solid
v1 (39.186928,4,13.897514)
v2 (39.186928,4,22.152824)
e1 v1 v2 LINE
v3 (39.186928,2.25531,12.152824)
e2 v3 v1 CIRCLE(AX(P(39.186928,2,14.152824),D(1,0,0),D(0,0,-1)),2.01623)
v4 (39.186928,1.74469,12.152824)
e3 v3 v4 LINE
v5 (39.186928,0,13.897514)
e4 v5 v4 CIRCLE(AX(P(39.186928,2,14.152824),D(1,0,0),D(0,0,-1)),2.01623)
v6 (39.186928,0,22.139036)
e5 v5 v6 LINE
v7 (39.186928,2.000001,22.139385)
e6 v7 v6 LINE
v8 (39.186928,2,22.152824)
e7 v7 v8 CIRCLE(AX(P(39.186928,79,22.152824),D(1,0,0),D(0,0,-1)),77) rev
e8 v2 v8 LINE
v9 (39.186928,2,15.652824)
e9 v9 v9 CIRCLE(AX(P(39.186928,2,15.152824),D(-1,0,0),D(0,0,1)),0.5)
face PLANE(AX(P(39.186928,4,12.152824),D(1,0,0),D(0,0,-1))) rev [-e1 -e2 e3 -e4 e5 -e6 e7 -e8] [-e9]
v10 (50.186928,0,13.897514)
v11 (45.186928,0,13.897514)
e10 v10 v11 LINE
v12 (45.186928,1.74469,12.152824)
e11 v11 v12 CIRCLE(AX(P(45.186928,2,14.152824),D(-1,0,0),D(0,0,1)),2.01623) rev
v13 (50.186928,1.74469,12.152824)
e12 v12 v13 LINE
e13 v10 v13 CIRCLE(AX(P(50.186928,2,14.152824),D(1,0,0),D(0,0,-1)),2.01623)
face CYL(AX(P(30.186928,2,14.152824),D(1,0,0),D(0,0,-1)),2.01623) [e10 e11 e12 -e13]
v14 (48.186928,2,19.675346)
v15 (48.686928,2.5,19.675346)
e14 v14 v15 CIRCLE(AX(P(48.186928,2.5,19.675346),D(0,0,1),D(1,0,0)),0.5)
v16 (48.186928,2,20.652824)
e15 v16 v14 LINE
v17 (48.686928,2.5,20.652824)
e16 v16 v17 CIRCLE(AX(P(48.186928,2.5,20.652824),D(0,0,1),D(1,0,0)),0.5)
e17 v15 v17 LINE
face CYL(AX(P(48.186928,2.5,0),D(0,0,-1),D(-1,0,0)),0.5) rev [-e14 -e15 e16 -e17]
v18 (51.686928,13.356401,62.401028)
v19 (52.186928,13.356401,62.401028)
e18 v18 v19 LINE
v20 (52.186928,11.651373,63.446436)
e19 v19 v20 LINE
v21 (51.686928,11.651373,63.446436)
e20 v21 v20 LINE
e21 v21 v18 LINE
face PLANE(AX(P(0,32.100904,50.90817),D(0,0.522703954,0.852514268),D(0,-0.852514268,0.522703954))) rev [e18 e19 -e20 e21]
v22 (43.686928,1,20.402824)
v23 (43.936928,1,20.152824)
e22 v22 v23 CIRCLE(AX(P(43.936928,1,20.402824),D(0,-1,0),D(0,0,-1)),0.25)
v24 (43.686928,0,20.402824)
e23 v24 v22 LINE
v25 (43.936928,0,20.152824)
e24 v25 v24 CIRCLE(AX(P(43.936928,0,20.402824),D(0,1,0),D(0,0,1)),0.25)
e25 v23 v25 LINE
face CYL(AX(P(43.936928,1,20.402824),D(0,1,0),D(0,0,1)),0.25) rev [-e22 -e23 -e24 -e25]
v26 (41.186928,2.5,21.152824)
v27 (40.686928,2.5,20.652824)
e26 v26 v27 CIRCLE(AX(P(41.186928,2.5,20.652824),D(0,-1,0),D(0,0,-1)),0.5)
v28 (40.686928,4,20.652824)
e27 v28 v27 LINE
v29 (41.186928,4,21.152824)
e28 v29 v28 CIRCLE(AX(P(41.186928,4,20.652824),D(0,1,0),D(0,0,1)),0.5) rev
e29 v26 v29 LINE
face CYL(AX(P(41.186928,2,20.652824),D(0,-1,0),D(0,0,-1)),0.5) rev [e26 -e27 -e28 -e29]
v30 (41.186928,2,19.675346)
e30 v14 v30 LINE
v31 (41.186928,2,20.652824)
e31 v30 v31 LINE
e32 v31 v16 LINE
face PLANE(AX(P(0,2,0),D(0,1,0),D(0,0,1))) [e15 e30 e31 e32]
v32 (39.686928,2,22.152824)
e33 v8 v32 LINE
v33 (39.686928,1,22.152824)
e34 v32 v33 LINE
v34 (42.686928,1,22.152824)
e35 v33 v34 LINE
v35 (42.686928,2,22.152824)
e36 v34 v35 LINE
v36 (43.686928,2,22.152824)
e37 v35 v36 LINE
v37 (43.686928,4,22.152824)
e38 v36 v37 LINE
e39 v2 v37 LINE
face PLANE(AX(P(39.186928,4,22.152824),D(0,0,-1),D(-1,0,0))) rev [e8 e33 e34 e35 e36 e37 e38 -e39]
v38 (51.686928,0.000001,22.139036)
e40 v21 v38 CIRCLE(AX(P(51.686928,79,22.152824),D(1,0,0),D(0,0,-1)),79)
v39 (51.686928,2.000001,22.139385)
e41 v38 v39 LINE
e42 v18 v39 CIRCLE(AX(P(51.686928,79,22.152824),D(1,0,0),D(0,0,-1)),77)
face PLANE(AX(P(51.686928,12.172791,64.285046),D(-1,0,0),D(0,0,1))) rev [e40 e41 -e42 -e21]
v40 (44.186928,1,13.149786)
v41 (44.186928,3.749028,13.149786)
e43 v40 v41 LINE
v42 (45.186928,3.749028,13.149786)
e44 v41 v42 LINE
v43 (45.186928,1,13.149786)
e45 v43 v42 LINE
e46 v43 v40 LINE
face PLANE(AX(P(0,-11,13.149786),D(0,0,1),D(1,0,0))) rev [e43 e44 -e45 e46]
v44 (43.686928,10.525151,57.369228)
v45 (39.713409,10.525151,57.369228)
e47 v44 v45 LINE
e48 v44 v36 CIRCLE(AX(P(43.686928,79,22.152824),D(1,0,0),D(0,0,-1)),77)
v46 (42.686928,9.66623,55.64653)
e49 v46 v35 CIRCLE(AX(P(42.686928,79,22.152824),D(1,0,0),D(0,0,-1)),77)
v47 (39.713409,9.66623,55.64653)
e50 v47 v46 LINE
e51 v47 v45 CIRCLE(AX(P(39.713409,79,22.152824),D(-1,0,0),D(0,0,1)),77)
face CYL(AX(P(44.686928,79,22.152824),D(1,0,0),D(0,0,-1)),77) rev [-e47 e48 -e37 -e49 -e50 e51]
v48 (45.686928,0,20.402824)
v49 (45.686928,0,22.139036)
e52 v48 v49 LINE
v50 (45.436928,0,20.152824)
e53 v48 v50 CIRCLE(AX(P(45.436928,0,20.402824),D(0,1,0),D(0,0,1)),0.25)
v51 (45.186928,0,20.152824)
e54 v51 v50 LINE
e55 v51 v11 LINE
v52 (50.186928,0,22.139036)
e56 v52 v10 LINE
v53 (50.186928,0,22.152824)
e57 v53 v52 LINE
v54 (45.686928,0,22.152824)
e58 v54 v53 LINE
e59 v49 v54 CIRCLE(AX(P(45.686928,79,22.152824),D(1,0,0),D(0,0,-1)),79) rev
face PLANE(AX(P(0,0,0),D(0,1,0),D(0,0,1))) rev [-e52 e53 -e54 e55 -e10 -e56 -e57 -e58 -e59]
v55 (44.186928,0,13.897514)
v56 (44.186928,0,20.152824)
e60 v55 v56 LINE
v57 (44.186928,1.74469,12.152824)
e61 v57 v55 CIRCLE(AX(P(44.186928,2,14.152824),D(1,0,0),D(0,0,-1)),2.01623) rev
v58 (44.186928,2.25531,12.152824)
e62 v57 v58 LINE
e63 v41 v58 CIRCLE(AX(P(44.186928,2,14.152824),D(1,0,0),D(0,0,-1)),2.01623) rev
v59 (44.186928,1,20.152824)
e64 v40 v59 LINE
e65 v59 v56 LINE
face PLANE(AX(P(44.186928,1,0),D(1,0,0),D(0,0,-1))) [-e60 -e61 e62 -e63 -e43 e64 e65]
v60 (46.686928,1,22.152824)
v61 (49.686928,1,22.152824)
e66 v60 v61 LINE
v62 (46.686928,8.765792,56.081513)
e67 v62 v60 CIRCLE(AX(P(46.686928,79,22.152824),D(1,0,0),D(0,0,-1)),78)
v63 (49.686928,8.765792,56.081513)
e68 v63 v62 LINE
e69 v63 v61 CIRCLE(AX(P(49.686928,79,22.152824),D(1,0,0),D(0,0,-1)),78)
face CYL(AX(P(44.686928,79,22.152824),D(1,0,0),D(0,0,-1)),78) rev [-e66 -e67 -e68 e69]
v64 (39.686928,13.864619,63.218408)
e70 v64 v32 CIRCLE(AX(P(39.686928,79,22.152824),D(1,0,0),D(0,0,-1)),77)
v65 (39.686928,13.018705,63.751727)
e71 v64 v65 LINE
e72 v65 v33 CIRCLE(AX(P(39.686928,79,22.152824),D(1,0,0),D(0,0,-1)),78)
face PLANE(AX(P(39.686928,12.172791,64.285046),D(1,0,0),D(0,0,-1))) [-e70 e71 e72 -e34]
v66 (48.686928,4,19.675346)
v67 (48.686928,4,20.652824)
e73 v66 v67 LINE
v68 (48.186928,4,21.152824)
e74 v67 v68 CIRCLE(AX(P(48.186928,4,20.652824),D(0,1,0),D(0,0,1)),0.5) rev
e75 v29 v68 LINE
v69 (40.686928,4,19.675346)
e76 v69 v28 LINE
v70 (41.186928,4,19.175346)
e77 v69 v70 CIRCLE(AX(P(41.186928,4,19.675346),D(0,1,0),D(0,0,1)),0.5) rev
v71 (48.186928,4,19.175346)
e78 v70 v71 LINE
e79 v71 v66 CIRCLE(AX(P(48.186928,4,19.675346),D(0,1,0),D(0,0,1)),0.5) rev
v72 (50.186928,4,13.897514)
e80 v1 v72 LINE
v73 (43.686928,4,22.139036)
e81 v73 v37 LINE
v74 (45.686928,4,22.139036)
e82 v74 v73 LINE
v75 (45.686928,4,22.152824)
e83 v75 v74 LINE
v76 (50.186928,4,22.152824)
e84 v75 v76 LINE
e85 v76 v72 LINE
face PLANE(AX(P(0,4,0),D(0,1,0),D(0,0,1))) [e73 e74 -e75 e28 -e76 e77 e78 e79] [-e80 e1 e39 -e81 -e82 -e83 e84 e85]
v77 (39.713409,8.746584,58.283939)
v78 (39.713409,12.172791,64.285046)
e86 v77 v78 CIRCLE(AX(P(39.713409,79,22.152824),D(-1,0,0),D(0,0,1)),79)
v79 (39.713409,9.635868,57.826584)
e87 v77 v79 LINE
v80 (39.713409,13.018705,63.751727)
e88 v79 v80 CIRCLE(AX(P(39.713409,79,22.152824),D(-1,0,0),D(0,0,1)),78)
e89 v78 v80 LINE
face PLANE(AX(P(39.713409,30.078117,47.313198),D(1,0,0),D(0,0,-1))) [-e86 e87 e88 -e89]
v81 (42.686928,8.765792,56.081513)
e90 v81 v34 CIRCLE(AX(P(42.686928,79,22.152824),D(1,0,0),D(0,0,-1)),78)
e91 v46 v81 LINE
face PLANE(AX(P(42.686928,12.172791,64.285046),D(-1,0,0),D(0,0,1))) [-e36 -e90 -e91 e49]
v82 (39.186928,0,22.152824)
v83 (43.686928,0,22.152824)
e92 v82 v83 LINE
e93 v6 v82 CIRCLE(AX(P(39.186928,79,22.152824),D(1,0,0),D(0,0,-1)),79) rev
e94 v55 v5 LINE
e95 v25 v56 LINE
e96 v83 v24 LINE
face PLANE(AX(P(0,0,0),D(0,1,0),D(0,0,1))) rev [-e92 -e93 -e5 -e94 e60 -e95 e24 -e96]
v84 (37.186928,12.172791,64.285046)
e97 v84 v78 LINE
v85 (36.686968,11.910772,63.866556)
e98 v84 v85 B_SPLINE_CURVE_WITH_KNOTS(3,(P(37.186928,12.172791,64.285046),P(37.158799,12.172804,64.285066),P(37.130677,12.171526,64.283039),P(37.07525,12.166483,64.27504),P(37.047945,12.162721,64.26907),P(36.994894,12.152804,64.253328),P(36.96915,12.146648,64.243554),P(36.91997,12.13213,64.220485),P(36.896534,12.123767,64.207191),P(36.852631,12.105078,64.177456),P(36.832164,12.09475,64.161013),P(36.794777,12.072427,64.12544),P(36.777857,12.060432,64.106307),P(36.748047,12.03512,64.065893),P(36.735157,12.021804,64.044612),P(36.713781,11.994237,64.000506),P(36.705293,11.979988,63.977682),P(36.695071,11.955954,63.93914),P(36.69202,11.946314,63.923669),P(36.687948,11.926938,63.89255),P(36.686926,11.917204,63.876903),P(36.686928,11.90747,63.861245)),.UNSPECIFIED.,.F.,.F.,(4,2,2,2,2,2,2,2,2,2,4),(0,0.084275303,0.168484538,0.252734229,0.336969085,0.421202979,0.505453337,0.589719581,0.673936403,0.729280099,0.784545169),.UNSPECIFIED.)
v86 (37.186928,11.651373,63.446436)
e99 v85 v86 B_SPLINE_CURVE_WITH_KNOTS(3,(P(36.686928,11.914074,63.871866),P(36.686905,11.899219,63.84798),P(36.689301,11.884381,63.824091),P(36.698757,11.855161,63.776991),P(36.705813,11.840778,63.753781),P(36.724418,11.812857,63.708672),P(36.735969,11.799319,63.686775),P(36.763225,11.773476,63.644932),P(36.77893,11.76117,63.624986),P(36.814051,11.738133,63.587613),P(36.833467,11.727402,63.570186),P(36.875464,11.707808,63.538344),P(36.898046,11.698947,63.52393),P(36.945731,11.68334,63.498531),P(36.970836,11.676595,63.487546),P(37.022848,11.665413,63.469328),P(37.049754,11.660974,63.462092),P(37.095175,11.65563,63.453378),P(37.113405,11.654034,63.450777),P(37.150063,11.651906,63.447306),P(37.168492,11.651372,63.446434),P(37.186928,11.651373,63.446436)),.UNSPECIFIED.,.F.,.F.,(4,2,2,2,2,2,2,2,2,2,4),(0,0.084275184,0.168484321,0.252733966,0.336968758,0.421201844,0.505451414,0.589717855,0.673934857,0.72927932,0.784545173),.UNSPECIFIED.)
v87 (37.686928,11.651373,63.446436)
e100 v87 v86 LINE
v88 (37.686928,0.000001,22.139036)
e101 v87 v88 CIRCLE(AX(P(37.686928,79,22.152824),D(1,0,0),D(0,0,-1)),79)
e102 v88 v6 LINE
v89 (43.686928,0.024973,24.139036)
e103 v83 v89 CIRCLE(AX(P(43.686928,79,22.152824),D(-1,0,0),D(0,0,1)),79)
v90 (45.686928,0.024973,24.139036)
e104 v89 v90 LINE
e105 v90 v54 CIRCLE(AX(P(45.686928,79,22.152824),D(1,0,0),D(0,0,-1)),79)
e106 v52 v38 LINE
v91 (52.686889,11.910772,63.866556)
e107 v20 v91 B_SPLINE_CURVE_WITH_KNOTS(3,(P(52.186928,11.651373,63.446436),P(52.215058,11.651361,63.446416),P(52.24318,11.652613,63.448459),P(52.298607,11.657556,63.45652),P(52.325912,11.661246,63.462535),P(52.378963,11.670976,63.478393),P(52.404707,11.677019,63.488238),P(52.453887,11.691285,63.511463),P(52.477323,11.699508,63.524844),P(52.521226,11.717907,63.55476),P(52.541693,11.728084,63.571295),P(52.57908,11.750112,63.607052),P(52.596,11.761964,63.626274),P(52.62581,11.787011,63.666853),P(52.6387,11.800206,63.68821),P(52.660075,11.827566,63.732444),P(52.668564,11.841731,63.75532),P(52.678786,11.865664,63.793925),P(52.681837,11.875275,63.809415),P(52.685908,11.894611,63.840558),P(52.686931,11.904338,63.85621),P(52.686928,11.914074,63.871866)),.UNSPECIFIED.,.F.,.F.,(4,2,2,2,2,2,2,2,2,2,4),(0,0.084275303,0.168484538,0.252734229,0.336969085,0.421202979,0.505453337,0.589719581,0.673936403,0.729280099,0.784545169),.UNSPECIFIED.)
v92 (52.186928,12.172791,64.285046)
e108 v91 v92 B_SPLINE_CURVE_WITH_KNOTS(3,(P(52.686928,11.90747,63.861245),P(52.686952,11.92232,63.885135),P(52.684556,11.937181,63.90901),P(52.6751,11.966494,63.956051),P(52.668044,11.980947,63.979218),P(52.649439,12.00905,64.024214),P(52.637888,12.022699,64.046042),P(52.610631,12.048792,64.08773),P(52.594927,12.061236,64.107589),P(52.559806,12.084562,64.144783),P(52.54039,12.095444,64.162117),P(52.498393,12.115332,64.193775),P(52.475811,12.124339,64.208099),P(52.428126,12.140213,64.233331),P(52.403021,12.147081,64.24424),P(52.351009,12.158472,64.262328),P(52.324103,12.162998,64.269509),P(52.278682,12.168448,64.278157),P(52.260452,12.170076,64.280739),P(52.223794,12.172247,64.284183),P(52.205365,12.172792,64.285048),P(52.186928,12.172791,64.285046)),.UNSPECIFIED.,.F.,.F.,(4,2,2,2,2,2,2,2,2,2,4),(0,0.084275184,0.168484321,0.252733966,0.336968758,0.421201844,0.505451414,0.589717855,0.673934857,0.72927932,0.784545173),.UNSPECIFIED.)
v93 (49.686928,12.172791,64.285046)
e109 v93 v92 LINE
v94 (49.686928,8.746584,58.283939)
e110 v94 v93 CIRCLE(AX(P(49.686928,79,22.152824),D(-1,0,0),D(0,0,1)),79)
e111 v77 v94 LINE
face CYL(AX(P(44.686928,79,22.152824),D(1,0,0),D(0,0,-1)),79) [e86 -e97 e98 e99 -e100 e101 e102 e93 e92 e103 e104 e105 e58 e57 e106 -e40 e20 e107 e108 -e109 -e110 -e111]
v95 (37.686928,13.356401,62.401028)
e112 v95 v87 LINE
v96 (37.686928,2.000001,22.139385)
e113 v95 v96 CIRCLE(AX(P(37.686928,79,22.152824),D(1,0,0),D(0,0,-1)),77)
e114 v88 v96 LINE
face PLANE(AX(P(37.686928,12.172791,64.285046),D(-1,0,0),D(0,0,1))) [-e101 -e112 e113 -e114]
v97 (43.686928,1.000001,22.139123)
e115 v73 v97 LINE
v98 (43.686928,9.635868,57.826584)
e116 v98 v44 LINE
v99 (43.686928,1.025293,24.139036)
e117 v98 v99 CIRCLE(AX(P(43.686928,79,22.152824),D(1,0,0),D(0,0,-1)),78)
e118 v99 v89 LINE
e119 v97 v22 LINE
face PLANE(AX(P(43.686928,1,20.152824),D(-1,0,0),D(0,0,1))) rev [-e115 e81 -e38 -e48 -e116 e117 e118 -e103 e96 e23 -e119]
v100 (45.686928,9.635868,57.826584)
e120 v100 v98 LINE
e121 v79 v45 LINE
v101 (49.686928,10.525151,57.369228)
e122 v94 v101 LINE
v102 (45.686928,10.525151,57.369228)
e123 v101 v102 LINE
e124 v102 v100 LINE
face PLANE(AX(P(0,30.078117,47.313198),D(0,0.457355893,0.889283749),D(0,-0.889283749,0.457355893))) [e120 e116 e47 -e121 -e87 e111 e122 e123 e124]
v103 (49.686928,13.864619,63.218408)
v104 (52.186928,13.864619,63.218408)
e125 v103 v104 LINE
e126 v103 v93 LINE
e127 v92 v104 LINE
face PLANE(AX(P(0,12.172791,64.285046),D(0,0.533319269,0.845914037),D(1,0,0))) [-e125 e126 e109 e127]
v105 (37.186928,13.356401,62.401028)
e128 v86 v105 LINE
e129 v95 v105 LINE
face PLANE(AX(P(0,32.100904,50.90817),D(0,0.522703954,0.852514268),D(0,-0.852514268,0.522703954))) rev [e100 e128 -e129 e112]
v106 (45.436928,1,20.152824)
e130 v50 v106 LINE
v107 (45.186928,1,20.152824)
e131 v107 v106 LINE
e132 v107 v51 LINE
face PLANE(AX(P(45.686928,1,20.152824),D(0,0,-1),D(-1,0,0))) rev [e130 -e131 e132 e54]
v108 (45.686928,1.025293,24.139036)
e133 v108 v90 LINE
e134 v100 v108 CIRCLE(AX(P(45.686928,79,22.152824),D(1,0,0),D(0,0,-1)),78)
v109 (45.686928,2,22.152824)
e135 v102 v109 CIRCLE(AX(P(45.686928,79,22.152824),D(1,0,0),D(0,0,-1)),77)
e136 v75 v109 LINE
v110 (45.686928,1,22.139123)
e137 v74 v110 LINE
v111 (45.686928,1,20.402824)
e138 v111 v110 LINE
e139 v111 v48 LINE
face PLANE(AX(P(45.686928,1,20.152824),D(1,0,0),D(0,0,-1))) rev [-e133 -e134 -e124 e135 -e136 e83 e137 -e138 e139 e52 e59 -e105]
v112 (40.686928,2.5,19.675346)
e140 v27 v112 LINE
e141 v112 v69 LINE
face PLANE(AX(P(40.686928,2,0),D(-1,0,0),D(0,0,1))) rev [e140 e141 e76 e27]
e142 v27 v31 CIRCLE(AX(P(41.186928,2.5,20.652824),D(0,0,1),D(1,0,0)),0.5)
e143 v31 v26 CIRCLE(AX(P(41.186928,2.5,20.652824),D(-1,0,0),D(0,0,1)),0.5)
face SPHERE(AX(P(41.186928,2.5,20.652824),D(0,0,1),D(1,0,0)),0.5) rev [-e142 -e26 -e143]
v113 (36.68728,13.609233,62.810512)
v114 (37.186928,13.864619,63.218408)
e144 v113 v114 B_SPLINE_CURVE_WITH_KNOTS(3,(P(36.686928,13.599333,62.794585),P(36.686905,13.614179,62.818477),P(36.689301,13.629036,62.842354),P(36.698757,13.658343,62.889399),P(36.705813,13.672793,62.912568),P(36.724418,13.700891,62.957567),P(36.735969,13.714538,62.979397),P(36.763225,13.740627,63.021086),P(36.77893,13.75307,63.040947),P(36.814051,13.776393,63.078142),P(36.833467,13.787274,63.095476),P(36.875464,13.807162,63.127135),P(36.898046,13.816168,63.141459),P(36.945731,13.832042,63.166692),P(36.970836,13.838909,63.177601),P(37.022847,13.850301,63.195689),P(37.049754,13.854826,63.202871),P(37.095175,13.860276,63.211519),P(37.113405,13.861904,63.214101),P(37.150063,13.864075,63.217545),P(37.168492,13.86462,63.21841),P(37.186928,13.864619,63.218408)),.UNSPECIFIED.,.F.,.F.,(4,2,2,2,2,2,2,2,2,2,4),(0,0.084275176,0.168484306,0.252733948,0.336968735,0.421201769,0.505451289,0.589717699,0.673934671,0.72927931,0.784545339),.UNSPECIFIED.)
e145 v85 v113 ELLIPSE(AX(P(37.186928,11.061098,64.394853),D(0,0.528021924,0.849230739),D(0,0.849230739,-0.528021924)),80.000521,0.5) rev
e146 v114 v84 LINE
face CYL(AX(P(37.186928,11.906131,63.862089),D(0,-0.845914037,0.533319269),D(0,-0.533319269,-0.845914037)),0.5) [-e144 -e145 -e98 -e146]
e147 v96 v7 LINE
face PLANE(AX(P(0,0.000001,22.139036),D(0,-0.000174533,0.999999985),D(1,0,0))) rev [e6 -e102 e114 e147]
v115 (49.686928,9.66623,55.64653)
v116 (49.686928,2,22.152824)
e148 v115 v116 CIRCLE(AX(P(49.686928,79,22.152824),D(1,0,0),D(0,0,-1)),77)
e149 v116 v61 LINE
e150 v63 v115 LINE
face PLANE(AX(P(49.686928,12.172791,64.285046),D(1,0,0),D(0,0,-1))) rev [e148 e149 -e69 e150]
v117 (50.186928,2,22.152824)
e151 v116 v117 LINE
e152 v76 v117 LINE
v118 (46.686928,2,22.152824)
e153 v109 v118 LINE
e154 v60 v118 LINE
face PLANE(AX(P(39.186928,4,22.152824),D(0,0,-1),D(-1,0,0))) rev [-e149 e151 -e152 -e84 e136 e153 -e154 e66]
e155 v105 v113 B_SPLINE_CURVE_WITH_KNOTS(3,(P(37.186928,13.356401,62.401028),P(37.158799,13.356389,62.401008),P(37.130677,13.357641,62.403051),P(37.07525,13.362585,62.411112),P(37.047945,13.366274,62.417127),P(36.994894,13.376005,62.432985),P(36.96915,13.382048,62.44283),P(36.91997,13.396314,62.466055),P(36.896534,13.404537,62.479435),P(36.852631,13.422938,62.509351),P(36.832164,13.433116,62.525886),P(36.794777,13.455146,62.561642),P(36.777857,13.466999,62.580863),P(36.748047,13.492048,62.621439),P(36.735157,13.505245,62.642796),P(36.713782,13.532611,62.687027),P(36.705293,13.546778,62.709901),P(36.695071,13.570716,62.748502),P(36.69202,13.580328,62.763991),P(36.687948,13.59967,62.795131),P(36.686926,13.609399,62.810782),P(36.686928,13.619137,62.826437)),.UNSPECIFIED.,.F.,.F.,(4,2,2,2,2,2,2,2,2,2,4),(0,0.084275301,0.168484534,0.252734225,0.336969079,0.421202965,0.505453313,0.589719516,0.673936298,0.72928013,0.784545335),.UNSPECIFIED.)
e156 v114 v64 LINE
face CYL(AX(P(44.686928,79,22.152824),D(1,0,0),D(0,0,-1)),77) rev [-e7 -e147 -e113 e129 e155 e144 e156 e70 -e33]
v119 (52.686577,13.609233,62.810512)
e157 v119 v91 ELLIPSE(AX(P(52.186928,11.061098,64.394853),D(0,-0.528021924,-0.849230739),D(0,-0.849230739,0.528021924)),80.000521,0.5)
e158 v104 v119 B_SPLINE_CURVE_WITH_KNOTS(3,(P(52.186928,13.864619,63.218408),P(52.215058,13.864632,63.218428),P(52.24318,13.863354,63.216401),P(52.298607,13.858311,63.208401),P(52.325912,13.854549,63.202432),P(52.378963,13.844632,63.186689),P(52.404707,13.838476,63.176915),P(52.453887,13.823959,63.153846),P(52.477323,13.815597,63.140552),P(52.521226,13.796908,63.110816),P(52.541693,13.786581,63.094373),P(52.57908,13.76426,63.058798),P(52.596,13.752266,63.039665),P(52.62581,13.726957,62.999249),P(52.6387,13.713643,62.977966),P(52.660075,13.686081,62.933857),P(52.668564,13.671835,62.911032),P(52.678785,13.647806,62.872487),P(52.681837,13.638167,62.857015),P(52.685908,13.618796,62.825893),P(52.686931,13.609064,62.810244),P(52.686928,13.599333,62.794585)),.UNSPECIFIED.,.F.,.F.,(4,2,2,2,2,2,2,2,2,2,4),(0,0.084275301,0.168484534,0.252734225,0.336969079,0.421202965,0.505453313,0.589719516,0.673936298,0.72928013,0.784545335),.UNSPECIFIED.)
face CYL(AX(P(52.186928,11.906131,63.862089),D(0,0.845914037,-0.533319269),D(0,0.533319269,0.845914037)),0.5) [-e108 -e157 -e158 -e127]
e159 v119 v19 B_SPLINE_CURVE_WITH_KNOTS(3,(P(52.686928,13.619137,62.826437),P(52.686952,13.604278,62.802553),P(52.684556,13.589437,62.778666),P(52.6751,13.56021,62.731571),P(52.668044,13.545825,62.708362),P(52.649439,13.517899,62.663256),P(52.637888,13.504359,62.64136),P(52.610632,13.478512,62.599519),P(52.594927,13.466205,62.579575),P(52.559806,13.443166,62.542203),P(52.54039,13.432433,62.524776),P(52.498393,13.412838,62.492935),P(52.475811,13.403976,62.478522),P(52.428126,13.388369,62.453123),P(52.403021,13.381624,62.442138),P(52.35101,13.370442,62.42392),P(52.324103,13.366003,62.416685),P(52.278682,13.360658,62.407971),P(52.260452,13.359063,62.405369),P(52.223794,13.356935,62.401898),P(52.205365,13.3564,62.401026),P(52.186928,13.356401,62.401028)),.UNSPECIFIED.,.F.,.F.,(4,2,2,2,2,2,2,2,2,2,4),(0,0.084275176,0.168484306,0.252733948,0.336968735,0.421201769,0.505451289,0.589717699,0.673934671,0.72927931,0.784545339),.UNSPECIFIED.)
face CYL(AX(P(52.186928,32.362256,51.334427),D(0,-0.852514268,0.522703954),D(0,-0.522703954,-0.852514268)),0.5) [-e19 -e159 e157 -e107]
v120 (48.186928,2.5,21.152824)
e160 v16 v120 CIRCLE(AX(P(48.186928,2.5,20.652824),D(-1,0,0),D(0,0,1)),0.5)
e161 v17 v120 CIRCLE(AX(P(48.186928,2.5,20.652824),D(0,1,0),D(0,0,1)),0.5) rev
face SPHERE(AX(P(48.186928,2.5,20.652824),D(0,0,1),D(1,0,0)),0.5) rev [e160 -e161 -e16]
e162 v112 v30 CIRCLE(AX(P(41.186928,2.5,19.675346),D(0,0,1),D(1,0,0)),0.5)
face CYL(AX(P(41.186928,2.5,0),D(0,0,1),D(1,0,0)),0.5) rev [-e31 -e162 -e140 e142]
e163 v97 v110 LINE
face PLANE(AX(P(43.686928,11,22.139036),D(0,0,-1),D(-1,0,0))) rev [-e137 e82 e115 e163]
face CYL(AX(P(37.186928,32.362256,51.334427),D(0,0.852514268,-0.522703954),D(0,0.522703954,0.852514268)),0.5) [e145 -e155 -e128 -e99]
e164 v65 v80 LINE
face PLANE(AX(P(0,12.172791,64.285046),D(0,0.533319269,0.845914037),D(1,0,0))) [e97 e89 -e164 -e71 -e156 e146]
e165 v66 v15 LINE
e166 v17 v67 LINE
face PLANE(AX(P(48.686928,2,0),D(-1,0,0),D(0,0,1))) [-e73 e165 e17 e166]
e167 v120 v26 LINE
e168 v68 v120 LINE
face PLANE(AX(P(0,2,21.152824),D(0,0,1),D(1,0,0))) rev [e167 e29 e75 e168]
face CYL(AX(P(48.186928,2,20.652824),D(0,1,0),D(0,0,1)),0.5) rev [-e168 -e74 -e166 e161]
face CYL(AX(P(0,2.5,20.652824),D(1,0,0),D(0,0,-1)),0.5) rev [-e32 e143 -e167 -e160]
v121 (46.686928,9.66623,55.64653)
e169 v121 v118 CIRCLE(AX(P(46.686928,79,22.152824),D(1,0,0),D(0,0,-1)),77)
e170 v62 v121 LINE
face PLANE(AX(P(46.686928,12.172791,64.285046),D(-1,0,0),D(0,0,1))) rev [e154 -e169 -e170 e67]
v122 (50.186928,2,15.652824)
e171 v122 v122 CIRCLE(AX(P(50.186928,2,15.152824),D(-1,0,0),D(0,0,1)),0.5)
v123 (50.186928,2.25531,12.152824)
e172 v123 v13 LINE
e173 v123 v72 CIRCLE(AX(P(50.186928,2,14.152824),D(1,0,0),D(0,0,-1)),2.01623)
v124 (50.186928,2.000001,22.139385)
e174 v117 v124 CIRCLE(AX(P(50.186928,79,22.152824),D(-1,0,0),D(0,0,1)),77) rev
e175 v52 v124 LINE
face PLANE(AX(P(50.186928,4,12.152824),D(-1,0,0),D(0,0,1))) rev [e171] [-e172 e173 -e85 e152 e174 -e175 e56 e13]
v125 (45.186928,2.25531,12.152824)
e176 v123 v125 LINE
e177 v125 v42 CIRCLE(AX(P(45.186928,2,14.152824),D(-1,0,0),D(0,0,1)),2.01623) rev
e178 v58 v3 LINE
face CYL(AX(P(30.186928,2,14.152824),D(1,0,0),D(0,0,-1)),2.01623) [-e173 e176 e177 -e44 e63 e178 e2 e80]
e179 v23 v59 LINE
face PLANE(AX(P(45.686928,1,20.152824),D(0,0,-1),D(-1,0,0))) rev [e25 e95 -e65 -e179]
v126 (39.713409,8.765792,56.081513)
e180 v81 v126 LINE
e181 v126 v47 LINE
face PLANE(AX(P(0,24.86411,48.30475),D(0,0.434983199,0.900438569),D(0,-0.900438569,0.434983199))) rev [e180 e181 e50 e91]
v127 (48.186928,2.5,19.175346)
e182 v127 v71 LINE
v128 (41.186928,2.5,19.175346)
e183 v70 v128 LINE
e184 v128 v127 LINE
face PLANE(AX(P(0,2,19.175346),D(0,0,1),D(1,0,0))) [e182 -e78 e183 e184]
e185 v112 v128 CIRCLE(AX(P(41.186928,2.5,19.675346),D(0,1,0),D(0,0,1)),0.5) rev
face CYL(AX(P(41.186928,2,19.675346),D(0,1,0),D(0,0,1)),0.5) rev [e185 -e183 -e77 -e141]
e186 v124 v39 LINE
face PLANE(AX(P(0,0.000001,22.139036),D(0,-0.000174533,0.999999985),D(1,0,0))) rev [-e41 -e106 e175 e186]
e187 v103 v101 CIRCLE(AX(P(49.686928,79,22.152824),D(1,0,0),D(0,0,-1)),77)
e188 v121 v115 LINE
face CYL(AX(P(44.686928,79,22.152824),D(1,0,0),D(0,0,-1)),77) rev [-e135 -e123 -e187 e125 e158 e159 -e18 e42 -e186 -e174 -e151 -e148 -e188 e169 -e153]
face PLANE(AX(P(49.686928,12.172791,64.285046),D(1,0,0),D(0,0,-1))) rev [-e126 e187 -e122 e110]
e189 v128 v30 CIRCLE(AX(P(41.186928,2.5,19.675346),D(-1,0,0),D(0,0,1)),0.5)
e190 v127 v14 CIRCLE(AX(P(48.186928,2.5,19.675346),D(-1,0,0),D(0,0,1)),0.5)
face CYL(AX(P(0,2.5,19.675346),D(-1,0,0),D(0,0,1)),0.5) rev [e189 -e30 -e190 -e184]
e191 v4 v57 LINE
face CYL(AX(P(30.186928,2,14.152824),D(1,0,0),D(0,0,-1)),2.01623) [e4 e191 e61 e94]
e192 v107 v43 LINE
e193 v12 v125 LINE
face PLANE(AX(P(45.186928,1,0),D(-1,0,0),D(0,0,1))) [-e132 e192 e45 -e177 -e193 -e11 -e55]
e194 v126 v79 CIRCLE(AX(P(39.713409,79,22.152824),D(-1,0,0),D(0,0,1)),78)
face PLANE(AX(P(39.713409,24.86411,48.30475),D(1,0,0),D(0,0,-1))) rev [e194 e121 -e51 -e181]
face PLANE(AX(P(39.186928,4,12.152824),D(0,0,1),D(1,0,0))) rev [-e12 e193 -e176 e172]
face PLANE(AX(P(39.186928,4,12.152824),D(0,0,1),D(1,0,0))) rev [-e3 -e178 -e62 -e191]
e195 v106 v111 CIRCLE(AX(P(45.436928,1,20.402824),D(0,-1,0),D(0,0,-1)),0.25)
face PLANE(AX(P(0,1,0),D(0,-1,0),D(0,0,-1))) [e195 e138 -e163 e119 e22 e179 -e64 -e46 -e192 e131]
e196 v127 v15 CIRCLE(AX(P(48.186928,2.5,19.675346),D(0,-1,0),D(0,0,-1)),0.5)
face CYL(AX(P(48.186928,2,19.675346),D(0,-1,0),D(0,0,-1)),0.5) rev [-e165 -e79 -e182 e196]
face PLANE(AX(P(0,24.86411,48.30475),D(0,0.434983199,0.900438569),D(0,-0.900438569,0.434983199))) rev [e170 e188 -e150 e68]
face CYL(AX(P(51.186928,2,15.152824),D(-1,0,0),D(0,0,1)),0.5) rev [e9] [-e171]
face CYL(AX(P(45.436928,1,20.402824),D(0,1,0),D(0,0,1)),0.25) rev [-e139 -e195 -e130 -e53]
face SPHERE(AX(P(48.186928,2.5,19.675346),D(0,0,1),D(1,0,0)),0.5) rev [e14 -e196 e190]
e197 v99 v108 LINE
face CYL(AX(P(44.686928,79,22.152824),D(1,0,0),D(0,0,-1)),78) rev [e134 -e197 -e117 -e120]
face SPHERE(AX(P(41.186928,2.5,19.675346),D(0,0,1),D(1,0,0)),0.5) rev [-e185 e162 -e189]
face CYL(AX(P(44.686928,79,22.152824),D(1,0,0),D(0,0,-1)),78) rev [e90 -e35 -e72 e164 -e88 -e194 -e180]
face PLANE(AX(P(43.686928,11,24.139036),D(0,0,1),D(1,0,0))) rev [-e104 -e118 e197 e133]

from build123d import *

# Parameters (mm, degrees)
CROQUIS1_W                  = 11
CROQUIS1_H                  = 10
SALIENTE_EXTRUIR1_DEPTH     = 4
CROQUIS2_R                  = 0.5
CORTAR_EXTRUIR1_DEPTH       = 12
CROQUIS3_W                  = 8
CROQUIS3_H                  = 1.977477592
CORTAR_EXTRUIR2_DEPTH       = 2
REDONDEO6_R                 = 0.5
REDONDEO8_R                 = 0.5
CORTAR_EXTRUIR3_DEPTH       = 20
CROQUIS5_W                  = 0.5
CROQUIS5_H                  = 1.744690478
CORTAR_EXTRUIR4_DEPTH       = 1
CORTAR_EXTRUIR6_DEPTH       = 12
CORTAR_EXTRUIR6_DEPTH_BACK  = 5
CROQUIS7_W                  = 1
CROQUIS7_H                  = 0.747728434
CROQUIS7_H_2                = 0.24923361
CROQUIS9_W                  = 2
CROQUIS9_H                  = 2
CORTAR_EXTRUIR7_DEPTH       = 1
REDONDEO10_R                = 0.25
CROQUIS11_W                 = 1.5
CROQUIS11_H                 = 1
CROQUIS11_W_2               = 0.5
CROQUIS11_W_3               = 1
REVOLUCI_N5_ANGLE           = 32.23
REVOLUCI_N5_OTHER_WAY_ANGLE = 0.01
CORTAR_EXTRUIR13_DEPTH      = 7
CORTAR_EXTRUIR13_DEPTH_BACK = 10
CROQUIS13_W                 = 2
CROQUIS13_H                 = 2
CORTAR_REVOLUCI_N1_ANGLE    = 5.013380707
CROQUIS15_W                 = 1
CROQUIS15_H                 = 2
REVOLUCI_N6_ANGLE           = 0.716197243
REDONDEO11_R                = 0.5
CROQUIS16_W                 = 2.973519437
CROQUIS16_H                 = 1
CROQUIS16_W_2               = 3
REVOLUCI_N7_ANGLE           = 1.432394488


with BuildPart() as part:
    # Croquis1 → Saliente-Extruir1 (new body)
    with BuildSketch(Plane(origin=(0, 0, 0), x_dir=(1, 0, 0), z_dir=(0, 1, 0))):
        with Locations((44.686928434, -17.152823879)):
            Rectangle(CROQUIS1_W, CROQUIS1_H)
    extrude(amount=SALIENTE_EXTRUIR1_DEPTH)

    # Croquis2 → Cortar-Extruir1 (cut)
    with BuildSketch(Plane.ZY.offset(-39.186928434)):
        with Locations((15.152823879, 2)):
            Circle(CROQUIS2_R)
    extrude(amount=-CORTAR_EXTRUIR1_DEPTH, mode=Mode.SUBTRACT)

    # Croquis3 → Cortar-Extruir2 (cut)
    with BuildSketch(Plane(origin=(0, 4, 0), x_dir=(1, 0, 0), z_dir=(0, 1, 0))):
        with Locations((44.686928434, -20.164085083)):
            Rectangle(CROQUIS3_W, CROQUIS3_H)
    extrude(amount=-CORTAR_EXTRUIR2_DEPTH, mode=Mode.SUBTRACT)

    # Redondeo6
    redondeo6_edges = [part.edges().sort_by_distance(p)[0] for p in [
        (48.686928434, 3, 19.175346287),
        (48.686928434, 3, 21.152823879),
        (40.686928434, 3, 21.152823879),
        (40.686928434, 3, 19.175346287),
    ]]
    fillet(redondeo6_edges, radius=REDONDEO6_R)

    # Redondeo8
    redondeo8_edges = [part.edges().sort_by_distance(p)[0] for p in [
        (44.686928434, 2, 19.175346287),
        (48.686928434, 2, 20.164085083),
        (40.686928434, 2, 20.164085083),
        (44.686928434, 2, 21.152823879),
        (40.833375043, 2, 19.321792897),
        (40.833375043, 2, 21.00637727),
        (48.540481825, 2, 21.00637727),
        (48.540481825, 2, 19.321792897),
    ]]
    fillet(redondeo8_edges, radius=REDONDEO8_R)

    # Croquis4 → Cortar-Extruir3 (cut)
    with BuildSketch(Plane(origin=(50.186928434, 0, 0), x_dir=(0, 0, -1), z_dir=(1, 0, 0))):
        with BuildLine():
            Line((-12.152823879, 4), (-13.897514357, 4))
            ThreePointArc((-13.897514357, 4), (-12.727134054, 3.425689825), (-12.152823879, 2.255309522))
            Line((-12.152823879, 2.255309522), (-12.152823879, 4))
        make_face()
        with BuildLine():
            ThreePointArc((-12.152823879, 1.744690478), (-12.727134054, 0.574310175), (-13.897514357, 0))
            Line((-13.897514357, 0), (-12.152823879, 0))
            Line((-12.152823879, 0), (-12.152823879, 1.744690478))
        make_face()
    extrude(amount=-CORTAR_EXTRUIR3_DEPTH, mode=Mode.SUBTRACT)

    # Croquis5 → Cortar-Extruir4 (cut)
    with BuildSketch(Plane.XZ):
        Polygon((44.686928434, 13.897514357), (44.686928434, 17.970046761), (44.686928434, 20.152823879), (44.186928434, 20.152823879), (44.186928434, 13.897514357), align=None)
        Polygon((44.686928434, 20.152823879), (44.686928434, 17.970046761), (44.686928434, 13.897514357), (45.186928434, 13.897514357), (45.186928434, 20.152823879), align=None)
        with Locations((44.436928434, 13.025169118)):
            Rectangle(CROQUIS5_W, CROQUIS5_H)
        with Locations((44.936928434, 13.025169118)):
            Rectangle(CROQUIS5_W, CROQUIS5_H)
    extrude(amount=-CORTAR_EXTRUIR4_DEPTH, mode=Mode.SUBTRACT)

    # Croquis7 → Cortar-Extruir6 (cut, two sides: drawn at the far end of the back side and taken through both)
    with BuildSketch(Plane.XZ.offset(-1).offset(-CORTAR_EXTRUIR6_DEPTH_BACK)):
        with Locations((44.686928434, 12.775921706)):
            Rectangle(CROQUIS7_W, CROQUIS7_H)
        with Locations((44.686928434, 12.277440684)):
            Rectangle(CROQUIS7_W, CROQUIS7_H_2)
    extrude(amount=CORTAR_EXTRUIR6_DEPTH + CORTAR_EXTRUIR6_DEPTH_BACK, mode=Mode.SUBTRACT)

    # Croquis9 → Cortar-Extruir7 (cut)
    with BuildSketch(Plane.XZ):
        with Locations((44.686928434, 21.152823879)):
            Rectangle(CROQUIS9_W, CROQUIS9_H)
    extrude(amount=-CORTAR_EXTRUIR7_DEPTH, mode=Mode.SUBTRACT)

    # Redondeo10
    redondeo10_edges = [part.edges().sort_by_distance(p)[0] for p in [
        (45.686928434, 0.5, 20.152823879),
        (43.686928434, 0.5, 20.152823879),
    ]]
    fillet(redondeo10_edges, radius=REDONDEO10_R)

    # Croquis11 → Revolución5 (revolve)
    with BuildSketch(Plane.XY.offset(22.152823879)):
        Polygon((39.186928434, 0), (43.686928434, 0), (43.686928434, 1), (42.686928434, 1), (39.686928434, 1), (39.186928434, 1), align=None)
        with Locations((38.436928434, 0.5)):
            Rectangle(CROQUIS11_W, CROQUIS11_H)
        with Locations((38.436928434, 1.5)):
            Rectangle(CROQUIS11_W, CROQUIS11_H)
        with Locations((39.436928434, 1.5)):
            Rectangle(CROQUIS11_W_2, CROQUIS11_H)
        with Locations((43.186928434, 1.5)):
            Rectangle(CROQUIS11_W_3, CROQUIS11_H)
        with Locations((44.186928434, 0.5)):
            Rectangle(CROQUIS11_W_3, CROQUIS11_H)
        with Locations((45.186928434, 0.5)):
            Rectangle(CROQUIS11_W_3, CROQUIS11_H)
        Polygon((45.686928434, 1), (45.686928434, 0), (50.186928434, 0), (50.186928434, 1), (49.686928434, 1), (46.686928434, 1), align=None)
        with Locations((50.936928434, 1.5)):
            Rectangle(CROQUIS11_W, CROQUIS11_H)
        with Locations((49.936928434, 1.5)):
            Rectangle(CROQUIS11_W_2, CROQUIS11_H)
        with Locations((50.936928434, 0.5)):
            Rectangle(CROQUIS11_W, CROQUIS11_H)
        with Locations((46.186928434, 1.5)):
            Rectangle(CROQUIS11_W_3, CROQUIS11_H)
    revolve(axis=Axis((44.686928434, 79, 22.152823879), (-1, 0, 0)), revolution_arc=REVOLUCI_N5_ANGLE)

    # Croquis11 → Revolución5 other way (revolve)
    with BuildSketch(Plane.XY.offset(22.152823879)):
        Polygon((39.186928434, 0), (43.686928434, 0), (43.686928434, 1), (42.686928434, 1), (39.686928434, 1), (39.186928434, 1), align=None)
        with Locations((38.436928434, 0.5)):
            Rectangle(CROQUIS11_W, CROQUIS11_H)
        with Locations((38.436928434, 1.5)):
            Rectangle(CROQUIS11_W, CROQUIS11_H)
        with Locations((39.436928434, 1.5)):
            Rectangle(CROQUIS11_W_2, CROQUIS11_H)
        with Locations((43.186928434, 1.5)):
            Rectangle(CROQUIS11_W_3, CROQUIS11_H)
        with Locations((44.186928434, 0.5)):
            Rectangle(CROQUIS11_W_3, CROQUIS11_H)
        with Locations((45.186928434, 0.5)):
            Rectangle(CROQUIS11_W_3, CROQUIS11_H)
        Polygon((45.686928434, 1), (45.686928434, 0), (50.186928434, 0), (50.186928434, 1), (49.686928434, 1), (46.686928434, 1), align=None)
        with Locations((50.936928434, 1.5)):
            Rectangle(CROQUIS11_W, CROQUIS11_H)
        with Locations((49.936928434, 1.5)):
            Rectangle(CROQUIS11_W_2, CROQUIS11_H)
        with Locations((50.936928434, 0.5)):
            Rectangle(CROQUIS11_W, CROQUIS11_H)
        with Locations((46.186928434, 1.5)):
            Rectangle(CROQUIS11_W_3, CROQUIS11_H)
    revolve(axis=Axis((44.686928434, 79, 22.152823879), (1, 0, 0)), revolution_arc=REVOLUCI_N5_OTHER_WAY_ANGLE)

    # Croquis13 → Cortar-Extruir13 (cut, two sides: drawn at the far end of the back side and taken through both)
    with BuildSketch(Plane(origin=(0, 1, 0), x_dir=(-1, 0, 0), z_dir=(0, -1, 0)).offset(-CORTAR_EXTRUIR13_DEPTH_BACK)):
        with Locations((-44.686928434, -23.139035778)):
            Rectangle(CROQUIS13_W, CROQUIS13_H)
    extrude(amount=CORTAR_EXTRUIR13_DEPTH + CORTAR_EXTRUIR13_DEPTH_BACK, mode=Mode.SUBTRACT)

    # Croquis14 → Cortar-Revolución1 (revolve, cut)
    with BuildSketch(Plane(origin=(0, 32.464000878, 51.49214672), x_dir=(1, 0, 0), z_dir=(0, 0.5333192687106637, 0.8459140367802884))):
        Polygon((39.713408997, -22.987318925), (39.713408997, -23.987318925), (44.700168716, -23.987318925), (44.700168716, -22.987318925), (43.686928434, -22.987318925), (43.686928434, -21.987318925), (42.686928434, -21.987318925), (42.686928434, -22.987318925), align=None)
        Polygon((44.700168716, -22.987318925), (44.700168716, -23.987318925), (49.686928434, -23.987318925), (49.686928434, -22.987318925), (46.686928434, -22.987318925), (46.686928434, -21.987318925), (45.686928434, -21.987318925), (45.686928434, -22.987318925), align=None)
    revolve(axis=Axis((44.700168716, 79, 22.152823879), (1, 0, 0)), revolution_arc=CORTAR_REVOLUCI_N1_ANGLE, mode=Mode.SUBTRACT)

    # Croquis15 → Revolución6 (revolve)
    with BuildSketch(Plane(origin=(0, 32.464000878, 51.49214672), x_dir=(1, 0, 0), z_dir=(0, 0.5333192687106637, 0.8459140367802884))):
        with Locations((37.186928434, -22.987318925)):
            Rectangle(CROQUIS15_W, CROQUIS15_H)
        with Locations((52.186928434, -22.987318925)):
            Rectangle(CROQUIS15_W, CROQUIS15_H)
    revolve(axis=Axis((39.713408997, 79, 22.152823879), (1, 0, 0)), revolution_arc=REVOLUCI_N6_ANGLE)

    # Redondeo11
    # the kernel refuses this fillet: 0.5 mm, written as the material it takes off along each edge
    with BuildSketch(Plane(origin=(52.686928434, 10.585730005, 64.099816155), x_dir=(0, 0.522703953599643, 0.8525142678520415), z_dir=(0, 0.8525142678520415, -0.5227039535996431)), Plane(origin=(52.686928434, 11.115398548, 64.951695193), x_dir=(-1, 0, 0), z_dir=(0, 0.8459140367802884, -0.5333192687106637)), Plane(origin=(36.686928434, 14.42204421, 61.747648364), x_dir=(0, 0.522703953599643, 0.8525142678520415), z_dir=(0, -0.8525142678520415, 0.5227039535996431)), Plane(origin=(36.686928434, 14.922011714, 62.551758484), x_dir=(1, 0, 0), z_dir=(0, -0.8459140367802884, 0.5333192687106637))) as redondeo11_piece_1:
        with BuildLine():
            CenterArc((REDONDEO11_R, -REDONDEO11_R), REDONDEO11_R, 90, 90)
            Line((0, -REDONDEO11_R), (0, 0))
            Line((0, 0), (REDONDEO11_R, 0))
        make_face()
    extrude(amount=4.5, mode=Mode.SUBTRACT)

    # Croquis16 → Revolución7 (revolve)
    with BuildSketch(Plane(origin=(0, 25.534756625, 49.649833864), x_dir=(1, 0, 0), z_dir=(0, 0.4573558931685637, 0.8892837494208389))):
        with Locations((41.200168715, -17.378308347)):
            Rectangle(CROQUIS16_W, CROQUIS16_H)
        with Locations((48.186928434, -17.378308347)):
            Rectangle(CROQUIS16_W_2, CROQUIS16_H)
    revolve(axis=Axis((44.700168716, 79, 22.152823879), (1, 0, 0)), revolution_arc=REVOLUCI_N7_ANGLE)


solid = part.part
